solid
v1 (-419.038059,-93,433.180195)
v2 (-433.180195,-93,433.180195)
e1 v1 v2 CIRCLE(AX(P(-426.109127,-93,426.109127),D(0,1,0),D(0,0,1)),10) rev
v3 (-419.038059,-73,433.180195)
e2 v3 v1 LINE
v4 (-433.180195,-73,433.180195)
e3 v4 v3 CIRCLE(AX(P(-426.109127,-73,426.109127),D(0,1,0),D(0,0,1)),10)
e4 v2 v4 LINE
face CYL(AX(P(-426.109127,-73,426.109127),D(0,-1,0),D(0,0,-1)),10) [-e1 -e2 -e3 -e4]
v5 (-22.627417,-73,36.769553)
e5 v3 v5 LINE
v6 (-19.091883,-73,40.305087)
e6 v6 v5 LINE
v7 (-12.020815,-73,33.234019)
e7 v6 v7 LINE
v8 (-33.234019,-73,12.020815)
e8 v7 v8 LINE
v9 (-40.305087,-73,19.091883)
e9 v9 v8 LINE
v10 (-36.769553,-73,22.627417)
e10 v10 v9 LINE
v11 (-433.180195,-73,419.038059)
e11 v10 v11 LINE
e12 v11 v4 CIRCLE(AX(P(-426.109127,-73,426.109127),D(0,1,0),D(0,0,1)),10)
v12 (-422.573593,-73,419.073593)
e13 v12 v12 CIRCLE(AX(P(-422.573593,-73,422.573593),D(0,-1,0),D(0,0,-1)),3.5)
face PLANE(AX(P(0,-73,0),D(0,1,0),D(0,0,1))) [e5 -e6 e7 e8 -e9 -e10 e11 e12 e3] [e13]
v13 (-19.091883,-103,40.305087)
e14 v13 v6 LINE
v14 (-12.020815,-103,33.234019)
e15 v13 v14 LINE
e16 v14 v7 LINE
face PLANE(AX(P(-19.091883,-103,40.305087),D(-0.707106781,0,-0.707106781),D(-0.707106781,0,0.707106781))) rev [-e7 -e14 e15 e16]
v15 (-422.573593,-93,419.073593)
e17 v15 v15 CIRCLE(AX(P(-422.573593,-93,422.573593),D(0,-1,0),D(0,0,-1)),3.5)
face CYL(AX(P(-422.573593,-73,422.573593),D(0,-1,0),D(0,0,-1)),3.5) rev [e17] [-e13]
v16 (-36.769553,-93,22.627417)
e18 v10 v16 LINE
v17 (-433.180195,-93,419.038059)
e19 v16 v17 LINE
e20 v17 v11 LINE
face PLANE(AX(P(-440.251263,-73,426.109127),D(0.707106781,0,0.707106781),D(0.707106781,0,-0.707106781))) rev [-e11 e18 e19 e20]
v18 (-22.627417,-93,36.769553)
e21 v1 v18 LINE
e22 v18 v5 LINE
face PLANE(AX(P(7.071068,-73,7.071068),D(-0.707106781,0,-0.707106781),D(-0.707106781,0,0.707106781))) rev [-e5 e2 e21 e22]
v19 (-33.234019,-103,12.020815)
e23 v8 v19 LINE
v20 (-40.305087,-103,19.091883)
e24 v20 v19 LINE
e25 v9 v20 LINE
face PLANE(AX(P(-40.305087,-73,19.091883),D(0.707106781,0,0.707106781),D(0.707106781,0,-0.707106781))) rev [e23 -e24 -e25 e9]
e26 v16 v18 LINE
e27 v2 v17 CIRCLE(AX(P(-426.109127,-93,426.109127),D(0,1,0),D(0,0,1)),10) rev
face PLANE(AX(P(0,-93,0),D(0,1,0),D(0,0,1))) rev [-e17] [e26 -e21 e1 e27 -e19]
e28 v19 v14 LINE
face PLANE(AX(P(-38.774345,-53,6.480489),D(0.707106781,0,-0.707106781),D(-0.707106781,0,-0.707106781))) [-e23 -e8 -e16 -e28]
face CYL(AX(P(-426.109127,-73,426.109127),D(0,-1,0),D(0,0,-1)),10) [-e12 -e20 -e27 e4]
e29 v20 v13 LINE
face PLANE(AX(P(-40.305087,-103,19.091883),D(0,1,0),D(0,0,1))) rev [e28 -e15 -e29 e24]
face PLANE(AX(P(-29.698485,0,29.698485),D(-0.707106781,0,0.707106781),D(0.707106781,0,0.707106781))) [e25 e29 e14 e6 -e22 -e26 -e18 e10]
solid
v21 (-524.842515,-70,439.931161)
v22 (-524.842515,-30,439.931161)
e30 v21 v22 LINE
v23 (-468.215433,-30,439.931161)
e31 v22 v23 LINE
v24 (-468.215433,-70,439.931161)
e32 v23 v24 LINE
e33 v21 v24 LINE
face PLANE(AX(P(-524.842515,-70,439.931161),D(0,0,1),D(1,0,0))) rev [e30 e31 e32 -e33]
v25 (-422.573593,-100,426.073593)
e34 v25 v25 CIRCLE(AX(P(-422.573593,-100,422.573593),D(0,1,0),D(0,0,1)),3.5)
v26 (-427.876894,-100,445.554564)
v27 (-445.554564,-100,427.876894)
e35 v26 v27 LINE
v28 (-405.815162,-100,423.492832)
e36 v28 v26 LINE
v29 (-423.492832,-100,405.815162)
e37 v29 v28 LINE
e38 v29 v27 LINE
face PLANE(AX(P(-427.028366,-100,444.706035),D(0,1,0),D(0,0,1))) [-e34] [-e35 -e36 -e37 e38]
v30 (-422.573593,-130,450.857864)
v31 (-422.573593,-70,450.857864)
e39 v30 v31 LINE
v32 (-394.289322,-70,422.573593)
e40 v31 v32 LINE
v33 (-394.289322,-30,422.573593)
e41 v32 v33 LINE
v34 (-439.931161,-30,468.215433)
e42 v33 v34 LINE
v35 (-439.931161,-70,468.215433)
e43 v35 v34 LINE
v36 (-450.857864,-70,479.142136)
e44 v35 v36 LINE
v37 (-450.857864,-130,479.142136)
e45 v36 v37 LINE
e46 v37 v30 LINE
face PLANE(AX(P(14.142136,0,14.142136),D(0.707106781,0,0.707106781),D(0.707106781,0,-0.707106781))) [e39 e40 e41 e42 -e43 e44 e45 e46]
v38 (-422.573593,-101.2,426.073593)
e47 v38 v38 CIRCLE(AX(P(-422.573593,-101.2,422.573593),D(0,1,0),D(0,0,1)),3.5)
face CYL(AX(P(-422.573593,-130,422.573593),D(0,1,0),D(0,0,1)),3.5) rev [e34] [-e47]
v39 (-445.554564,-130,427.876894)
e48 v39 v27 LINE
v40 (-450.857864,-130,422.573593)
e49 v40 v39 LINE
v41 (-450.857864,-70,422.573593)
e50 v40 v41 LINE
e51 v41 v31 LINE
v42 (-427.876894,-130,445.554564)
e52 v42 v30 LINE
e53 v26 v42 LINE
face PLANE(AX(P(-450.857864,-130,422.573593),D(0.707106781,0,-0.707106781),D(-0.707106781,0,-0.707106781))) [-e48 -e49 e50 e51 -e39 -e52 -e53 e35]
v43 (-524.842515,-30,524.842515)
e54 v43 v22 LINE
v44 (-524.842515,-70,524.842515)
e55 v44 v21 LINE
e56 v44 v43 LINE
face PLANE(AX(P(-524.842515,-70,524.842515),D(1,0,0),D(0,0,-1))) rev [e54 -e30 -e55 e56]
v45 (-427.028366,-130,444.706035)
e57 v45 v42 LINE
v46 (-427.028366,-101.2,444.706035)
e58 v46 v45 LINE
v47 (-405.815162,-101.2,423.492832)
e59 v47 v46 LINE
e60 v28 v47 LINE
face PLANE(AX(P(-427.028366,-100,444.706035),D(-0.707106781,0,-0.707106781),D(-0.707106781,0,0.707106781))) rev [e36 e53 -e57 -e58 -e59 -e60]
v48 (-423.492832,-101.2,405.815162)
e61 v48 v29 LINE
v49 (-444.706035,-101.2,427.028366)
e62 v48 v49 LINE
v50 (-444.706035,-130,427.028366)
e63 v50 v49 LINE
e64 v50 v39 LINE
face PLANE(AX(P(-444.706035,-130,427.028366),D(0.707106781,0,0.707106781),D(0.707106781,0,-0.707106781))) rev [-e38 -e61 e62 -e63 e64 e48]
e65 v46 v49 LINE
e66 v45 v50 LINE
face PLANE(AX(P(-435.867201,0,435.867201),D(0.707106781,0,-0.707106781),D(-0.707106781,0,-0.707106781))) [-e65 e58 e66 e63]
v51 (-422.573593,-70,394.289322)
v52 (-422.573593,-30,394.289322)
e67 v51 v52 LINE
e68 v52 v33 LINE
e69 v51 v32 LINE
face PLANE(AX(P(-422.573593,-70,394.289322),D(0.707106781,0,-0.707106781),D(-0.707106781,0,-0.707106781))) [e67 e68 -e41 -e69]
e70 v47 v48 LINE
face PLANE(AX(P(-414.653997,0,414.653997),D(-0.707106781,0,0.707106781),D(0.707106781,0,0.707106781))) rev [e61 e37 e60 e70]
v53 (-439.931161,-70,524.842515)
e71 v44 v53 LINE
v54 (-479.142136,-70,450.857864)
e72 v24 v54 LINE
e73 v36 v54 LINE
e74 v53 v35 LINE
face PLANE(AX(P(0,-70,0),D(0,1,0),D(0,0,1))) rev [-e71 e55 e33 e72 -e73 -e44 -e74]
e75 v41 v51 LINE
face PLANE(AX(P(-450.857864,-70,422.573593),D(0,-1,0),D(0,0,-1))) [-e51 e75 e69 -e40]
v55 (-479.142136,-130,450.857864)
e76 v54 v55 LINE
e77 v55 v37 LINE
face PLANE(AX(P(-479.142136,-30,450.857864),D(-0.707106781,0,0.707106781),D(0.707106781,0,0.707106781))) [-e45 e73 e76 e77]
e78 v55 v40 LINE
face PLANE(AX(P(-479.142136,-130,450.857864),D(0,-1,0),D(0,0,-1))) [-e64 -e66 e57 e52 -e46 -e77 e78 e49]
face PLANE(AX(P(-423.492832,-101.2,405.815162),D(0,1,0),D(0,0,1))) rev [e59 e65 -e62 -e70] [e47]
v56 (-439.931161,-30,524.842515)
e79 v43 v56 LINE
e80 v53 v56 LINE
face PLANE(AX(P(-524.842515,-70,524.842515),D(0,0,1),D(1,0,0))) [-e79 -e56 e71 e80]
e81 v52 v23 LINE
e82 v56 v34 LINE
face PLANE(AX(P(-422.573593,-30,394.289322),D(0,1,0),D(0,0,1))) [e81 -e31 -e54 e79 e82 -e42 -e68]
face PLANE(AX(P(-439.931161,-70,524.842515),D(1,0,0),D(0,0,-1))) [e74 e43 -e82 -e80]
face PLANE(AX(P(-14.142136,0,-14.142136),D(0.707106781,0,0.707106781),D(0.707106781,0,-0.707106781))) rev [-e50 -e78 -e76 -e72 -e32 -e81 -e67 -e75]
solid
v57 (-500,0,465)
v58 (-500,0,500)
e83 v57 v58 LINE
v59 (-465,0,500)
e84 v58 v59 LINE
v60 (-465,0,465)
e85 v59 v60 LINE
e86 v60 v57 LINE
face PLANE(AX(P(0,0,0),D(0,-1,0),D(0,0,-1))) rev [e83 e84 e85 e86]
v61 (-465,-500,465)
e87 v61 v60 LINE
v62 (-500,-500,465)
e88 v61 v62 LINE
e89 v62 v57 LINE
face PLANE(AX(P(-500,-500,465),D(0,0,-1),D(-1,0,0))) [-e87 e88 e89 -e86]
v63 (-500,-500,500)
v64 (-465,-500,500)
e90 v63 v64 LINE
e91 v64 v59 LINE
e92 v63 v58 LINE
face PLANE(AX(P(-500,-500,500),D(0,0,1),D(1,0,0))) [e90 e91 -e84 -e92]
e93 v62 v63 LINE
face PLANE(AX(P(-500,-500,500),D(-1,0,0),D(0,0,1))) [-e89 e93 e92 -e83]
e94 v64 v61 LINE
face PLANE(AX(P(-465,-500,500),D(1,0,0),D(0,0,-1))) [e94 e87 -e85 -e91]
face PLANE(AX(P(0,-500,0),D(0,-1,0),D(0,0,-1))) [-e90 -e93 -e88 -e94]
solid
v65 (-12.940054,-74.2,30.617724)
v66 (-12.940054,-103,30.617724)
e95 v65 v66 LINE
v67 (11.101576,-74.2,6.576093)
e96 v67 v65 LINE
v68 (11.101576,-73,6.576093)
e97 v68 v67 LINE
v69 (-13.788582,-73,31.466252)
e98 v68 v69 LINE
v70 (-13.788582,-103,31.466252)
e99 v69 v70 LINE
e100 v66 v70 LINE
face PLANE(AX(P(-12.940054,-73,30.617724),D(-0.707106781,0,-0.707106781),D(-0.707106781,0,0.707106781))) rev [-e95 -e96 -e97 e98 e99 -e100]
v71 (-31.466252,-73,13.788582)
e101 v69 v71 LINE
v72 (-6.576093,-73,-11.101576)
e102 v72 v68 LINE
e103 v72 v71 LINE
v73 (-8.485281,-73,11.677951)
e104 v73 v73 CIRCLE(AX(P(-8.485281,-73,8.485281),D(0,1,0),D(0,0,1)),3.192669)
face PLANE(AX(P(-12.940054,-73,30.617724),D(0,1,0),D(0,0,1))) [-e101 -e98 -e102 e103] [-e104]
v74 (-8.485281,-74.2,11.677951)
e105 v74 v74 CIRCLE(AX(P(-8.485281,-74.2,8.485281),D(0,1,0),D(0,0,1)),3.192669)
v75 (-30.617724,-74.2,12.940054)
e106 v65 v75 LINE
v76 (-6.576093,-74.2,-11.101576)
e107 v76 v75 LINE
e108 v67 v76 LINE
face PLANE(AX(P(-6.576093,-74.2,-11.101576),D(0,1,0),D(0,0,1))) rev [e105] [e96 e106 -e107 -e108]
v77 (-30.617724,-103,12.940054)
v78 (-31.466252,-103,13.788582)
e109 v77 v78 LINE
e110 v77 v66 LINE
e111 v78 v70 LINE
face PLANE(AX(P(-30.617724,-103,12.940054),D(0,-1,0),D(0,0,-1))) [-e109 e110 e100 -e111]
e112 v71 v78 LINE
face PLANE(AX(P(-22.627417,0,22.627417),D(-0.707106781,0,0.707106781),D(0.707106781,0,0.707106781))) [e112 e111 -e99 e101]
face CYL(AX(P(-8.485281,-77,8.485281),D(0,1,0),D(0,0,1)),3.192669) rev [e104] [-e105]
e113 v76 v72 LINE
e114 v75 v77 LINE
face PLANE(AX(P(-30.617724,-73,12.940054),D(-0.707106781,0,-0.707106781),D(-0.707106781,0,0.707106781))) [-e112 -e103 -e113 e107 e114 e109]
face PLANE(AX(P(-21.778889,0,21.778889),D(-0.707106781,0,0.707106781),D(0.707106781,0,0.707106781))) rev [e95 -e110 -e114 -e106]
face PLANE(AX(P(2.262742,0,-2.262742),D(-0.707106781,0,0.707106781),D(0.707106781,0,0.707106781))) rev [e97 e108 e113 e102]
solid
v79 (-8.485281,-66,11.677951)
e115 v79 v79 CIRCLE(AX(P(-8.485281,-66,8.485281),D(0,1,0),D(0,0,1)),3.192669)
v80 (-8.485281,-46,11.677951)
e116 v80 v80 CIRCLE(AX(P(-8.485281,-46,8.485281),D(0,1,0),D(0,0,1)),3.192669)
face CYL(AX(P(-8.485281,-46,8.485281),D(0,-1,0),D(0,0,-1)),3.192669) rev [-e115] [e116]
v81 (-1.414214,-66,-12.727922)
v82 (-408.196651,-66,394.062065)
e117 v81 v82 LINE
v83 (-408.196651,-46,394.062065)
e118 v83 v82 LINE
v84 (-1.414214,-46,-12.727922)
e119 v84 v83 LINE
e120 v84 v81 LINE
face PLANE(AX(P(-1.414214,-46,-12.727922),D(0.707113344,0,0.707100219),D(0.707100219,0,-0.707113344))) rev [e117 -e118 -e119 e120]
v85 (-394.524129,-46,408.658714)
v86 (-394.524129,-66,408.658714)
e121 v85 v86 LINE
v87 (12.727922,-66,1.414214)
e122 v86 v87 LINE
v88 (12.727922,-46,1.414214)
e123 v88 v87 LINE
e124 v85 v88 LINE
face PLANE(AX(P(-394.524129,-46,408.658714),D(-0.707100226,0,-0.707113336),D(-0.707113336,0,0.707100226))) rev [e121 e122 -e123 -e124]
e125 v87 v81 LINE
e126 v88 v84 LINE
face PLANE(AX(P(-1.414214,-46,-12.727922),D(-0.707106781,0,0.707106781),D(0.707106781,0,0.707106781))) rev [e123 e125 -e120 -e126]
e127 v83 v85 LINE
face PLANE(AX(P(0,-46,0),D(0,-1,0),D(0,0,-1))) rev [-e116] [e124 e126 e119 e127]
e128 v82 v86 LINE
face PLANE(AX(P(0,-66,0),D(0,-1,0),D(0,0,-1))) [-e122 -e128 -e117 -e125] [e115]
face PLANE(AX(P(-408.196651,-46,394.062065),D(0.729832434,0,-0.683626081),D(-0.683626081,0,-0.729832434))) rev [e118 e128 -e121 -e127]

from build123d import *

# Parameters (mm, degrees)
SKETCH2_W                = 35
SKETCH2_H                = 35
BOSS_EXTRUDE1_DEPTH      = 500
BOSS_EXTRUDE2_DEPTH      = 20
BOSS_EXTRUDE2_DEPTH_BACK = 20
SKETCH6_W                = 84.911353559
SKETCH6_H                = 84.911353559
BOSS_EXTRUDE9_DEPTH      = 40
SKETCH7_W                = 25
SKETCH7_H                = 30
BOSS_EXTRUDE10_DEPTH     = 1.2
SKETCH9_W                = 25
SKETCH9_H                = 1.2
BOSS_EXTRUDE11_DEPTH     = 30
SKETCH10_R               = 3.5
CUT_EXTRUDE1_DEPTH       = 30
BOSS_EXTRUDE12_DEPTH     = 20
FILLET1_R                = 10
CUT_EXTRUDE2_DEPTH       = 20
CUT_EXTRUDE2_DEPTH_BACK  = 30
SKETCH15_W               = 30
SKETCH15_H               = 30
BOSS_EXTRUDE14_DEPTH     = 10
SKETCH16_W               = 25
SKETCH16_H               = 30
BOSS_EXTRUDE15_DEPTH     = 1.2
SKETCH17_W               = 25
SKETCH17_H               = 1.2
BOSS_EXTRUDE16_DEPTH     = 34
SKETCH18_R               = 3.192669461
CUT_EXTRUDE3_DEPTH       = 4
SKETCH19_R               = 3.192669461
BOSS_EXTRUDE18_DEPTH     = 20
SKETCH20_R               = 3.5
CUT_EXTRUDE4_DEPTH       = 20


with BuildPart() as part:
    # Sketch2 → Boss-Extrude1 (new body)
    with BuildSketch(Plane(origin=(0, 0, 0), x_dir=(1, 0, 0), z_dir=(0, 1, 0))):
        with Locations((-482.5, -482.5)):
            Rectangle(SKETCH2_W, SKETCH2_H)
    extrude(amount=-BOSS_EXTRUDE1_DEPTH)


with BuildPart() as body_2:
    # Sketch5 → Boss-Extrude2 (new, two sides: drawn at the far end of the back side and taken through both)
    with BuildSketch(Plane(origin=(0, 0, 0), x_dir=(0.7071067811865475, 0, -0.7071067811865477), z_dir=(0.7071067811865477, 0, 0.7071067811865475)).offset(-BOSS_EXTRUDE2_DEPTH_BACK)):
        Polygon((-657.609306503, -130), (-617.609306503, -130), (-617.609306503, -70), (-577.609306503, -70), (-577.609306503, -30), (-657.609306503, -30), align=None)
    extrude(amount=BOSS_EXTRUDE2_DEPTH + BOSS_EXTRUDE2_DEPTH_BACK)


with BuildPart() as body_3:
    # Sketch6 → Boss-Extrude9 (new body)
    with BuildSketch(Plane(origin=(0, -30, 0), x_dir=(1, 0, 0), z_dir=(0, 1, 0))):
        with Locations((-482.386838229, -482.386838229)):
            Rectangle(SKETCH6_W, SKETCH6_H)
    extrude(amount=-BOSS_EXTRUDE9_DEPTH)


with BuildPart() as body_2_1:
    add(body_2.part)

    # Combine2: union body 3
    add(body_3.part)

    # Sketch7 → Boss-Extrude10 (add)
    with BuildSketch(Plane(origin=(-436.715728753, 0, 436.715728753), x_dir=(-0.7071067811865476, 0, -0.7071067811865476), z_dir=(0.7071067811865476, 0, -0.7071067811865476))):
        with Locations((0, -115)):
            Rectangle(SKETCH7_W, SKETCH7_H)
    extrude(amount=BOSS_EXTRUDE10_DEPTH)

    # Sketch9 → Boss-Extrude11 (add)
    with BuildSketch(Plane(origin=(-435.867200615, 0, 435.867200615), x_dir=(-0.7071067811865475, 0, -0.7071067811865477), z_dir=(0.7071067811865477, 0, -0.7071067811865475))):
        with Locations((0, -100.6)):
            Rectangle(SKETCH9_W, SKETCH9_H)
    extrude(amount=BOSS_EXTRUDE11_DEPTH)

    # Sketch10 → Cut-Extrude1 (cut)
    with BuildSketch(Plane(origin=(0, -100, 0), x_dir=(1, 0, 0), z_dir=(0, 1, 0))):
        with Locations(Location((-422.573593129, -422.573593129, 0), (0, 0, 270))):
            Circle(SKETCH10_R)
    extrude(amount=-CUT_EXTRUDE1_DEPTH, mode=Mode.SUBTRACT)


with BuildPart() as body_3_2:
    # Sketch13 → Boss-Extrude12 (new body)
    with BuildSketch(Plane(origin=(0, -93, 0), x_dir=(1, 0, 0), z_dir=(0, 1, 0))):
        Polygon((-440.251262658, -426.109127035), (-426.109127035, -440.251262658), (7.071067812, -7.071067812), (-7.071067812, 7.071067812), align=None)
    extrude(amount=BOSS_EXTRUDE12_DEPTH)

    # Fillet1
    fillet1_edges = [body_3_2.edges().sort_by_distance(p)[0] for p in [
        (-440.251262658, -83, 426.109127035),
        (-426.109127035, -83, 440.251262658),
    ]]
    fillet(fillet1_edges, radius=FILLET1_R - 0.0001)  # a hair under: the kernel refuses the full size

    # Sketch14 → Cut-Extrude2 (cut, two sides: drawn at the far end of the back side and taken through both)
    with BuildSketch(Plane(origin=(0, -73, 0), x_dir=(1, 0, 0), z_dir=(0, 1, 0)).offset(-CUT_EXTRUDE2_DEPTH_BACK)):
        Polygon((-38.774344763, -6.480489233), (-6.480489233, -38.774344763), (24.367106229, -7.926749301), (-7.926749301, 24.367106229), align=None)
    extrude(amount=CUT_EXTRUDE2_DEPTH + CUT_EXTRUDE2_DEPTH_BACK, mode=Mode.SUBTRACT)

    # Sketch15 → Boss-Extrude14 (add)
    with BuildSketch(Plane(origin=(-22.627416998, 0, 22.627416998), x_dir=(-0.7071067811865561, 0, -0.7071067811865389), z_dir=(0.7071067811865389, 0, -0.7071067811865561))):
        with Locations((0, -88)):
            Rectangle(SKETCH15_W, SKETCH15_H)
    extrude(amount=-BOSS_EXTRUDE14_DEPTH)

    # Sketch20 → Cut-Extrude4 (cut)
    with BuildSketch(Plane.XZ.offset(93)):
        with Locations(Location((-422.573593129, 422.573593129, 0), (0, 0, 270))):
            Circle(SKETCH20_R)
    extrude(amount=-CUT_EXTRUDE4_DEPTH, mode=Mode.SUBTRACT)


with BuildPart() as body_4:
    # Sketch16 → Boss-Extrude15 (new body)
    with BuildSketch(Plane(origin=(-22.627416998, 0, 22.627416998), x_dir=(-0.7071067811865561, 0, -0.7071067811865389), z_dir=(0.7071067811865389, 0, -0.7071067811865561))):
        with Locations((0, -88)):
            Rectangle(SKETCH16_W, SKETCH16_H)
    extrude(amount=BOSS_EXTRUDE15_DEPTH)

    # Sketch17 → Boss-Extrude16 (add)
    with BuildSketch(Plane(origin=(-21.778888861, 0, 21.778888861), x_dir=(-0.7071067811865561, 0, -0.7071067811865389), z_dir=(0.7071067811865389, 0, -0.7071067811865561))):
        with Locations((0, -73.6)):
            Rectangle(SKETCH17_W, SKETCH17_H)
    extrude(amount=BOSS_EXTRUDE16_DEPTH)

    # Sketch18 → Cut-Extrude3 (cut)
    with BuildSketch(Plane(origin=(0, -73, 0), x_dir=(1, 0, 0), z_dir=(0, 1, 0))):
        with Locations(Location((-8.485281374, -8.485281374, 0), (0, 0, 270))):
            Circle(SKETCH18_R)
    extrude(amount=-CUT_EXTRUDE3_DEPTH, mode=Mode.SUBTRACT)


with BuildPart() as body_5:
    # Sketch19 → Boss-Extrude18 (new body)
    with BuildSketch(Plane(origin=(0, -66, 0), x_dir=(1, 0, 0), z_dir=(0, 1, 0))):
        Polygon((-1.414213562, 12.727922061), (12.727922061, -1.414213562), (-394.524128884, -408.658714032), (-408.196650502, -394.062065355), align=None)
        with Locations(Location((-8.485281374, -8.485281374, 0), (0, 0, 270))):
            Circle(SKETCH19_R, mode=Mode.SUBTRACT)
    extrude(amount=BOSS_EXTRUDE18_DEPTH)


solid = Compound([part.part, body_2_1.part, body_3_2.part, body_4.part, body_5.part])
